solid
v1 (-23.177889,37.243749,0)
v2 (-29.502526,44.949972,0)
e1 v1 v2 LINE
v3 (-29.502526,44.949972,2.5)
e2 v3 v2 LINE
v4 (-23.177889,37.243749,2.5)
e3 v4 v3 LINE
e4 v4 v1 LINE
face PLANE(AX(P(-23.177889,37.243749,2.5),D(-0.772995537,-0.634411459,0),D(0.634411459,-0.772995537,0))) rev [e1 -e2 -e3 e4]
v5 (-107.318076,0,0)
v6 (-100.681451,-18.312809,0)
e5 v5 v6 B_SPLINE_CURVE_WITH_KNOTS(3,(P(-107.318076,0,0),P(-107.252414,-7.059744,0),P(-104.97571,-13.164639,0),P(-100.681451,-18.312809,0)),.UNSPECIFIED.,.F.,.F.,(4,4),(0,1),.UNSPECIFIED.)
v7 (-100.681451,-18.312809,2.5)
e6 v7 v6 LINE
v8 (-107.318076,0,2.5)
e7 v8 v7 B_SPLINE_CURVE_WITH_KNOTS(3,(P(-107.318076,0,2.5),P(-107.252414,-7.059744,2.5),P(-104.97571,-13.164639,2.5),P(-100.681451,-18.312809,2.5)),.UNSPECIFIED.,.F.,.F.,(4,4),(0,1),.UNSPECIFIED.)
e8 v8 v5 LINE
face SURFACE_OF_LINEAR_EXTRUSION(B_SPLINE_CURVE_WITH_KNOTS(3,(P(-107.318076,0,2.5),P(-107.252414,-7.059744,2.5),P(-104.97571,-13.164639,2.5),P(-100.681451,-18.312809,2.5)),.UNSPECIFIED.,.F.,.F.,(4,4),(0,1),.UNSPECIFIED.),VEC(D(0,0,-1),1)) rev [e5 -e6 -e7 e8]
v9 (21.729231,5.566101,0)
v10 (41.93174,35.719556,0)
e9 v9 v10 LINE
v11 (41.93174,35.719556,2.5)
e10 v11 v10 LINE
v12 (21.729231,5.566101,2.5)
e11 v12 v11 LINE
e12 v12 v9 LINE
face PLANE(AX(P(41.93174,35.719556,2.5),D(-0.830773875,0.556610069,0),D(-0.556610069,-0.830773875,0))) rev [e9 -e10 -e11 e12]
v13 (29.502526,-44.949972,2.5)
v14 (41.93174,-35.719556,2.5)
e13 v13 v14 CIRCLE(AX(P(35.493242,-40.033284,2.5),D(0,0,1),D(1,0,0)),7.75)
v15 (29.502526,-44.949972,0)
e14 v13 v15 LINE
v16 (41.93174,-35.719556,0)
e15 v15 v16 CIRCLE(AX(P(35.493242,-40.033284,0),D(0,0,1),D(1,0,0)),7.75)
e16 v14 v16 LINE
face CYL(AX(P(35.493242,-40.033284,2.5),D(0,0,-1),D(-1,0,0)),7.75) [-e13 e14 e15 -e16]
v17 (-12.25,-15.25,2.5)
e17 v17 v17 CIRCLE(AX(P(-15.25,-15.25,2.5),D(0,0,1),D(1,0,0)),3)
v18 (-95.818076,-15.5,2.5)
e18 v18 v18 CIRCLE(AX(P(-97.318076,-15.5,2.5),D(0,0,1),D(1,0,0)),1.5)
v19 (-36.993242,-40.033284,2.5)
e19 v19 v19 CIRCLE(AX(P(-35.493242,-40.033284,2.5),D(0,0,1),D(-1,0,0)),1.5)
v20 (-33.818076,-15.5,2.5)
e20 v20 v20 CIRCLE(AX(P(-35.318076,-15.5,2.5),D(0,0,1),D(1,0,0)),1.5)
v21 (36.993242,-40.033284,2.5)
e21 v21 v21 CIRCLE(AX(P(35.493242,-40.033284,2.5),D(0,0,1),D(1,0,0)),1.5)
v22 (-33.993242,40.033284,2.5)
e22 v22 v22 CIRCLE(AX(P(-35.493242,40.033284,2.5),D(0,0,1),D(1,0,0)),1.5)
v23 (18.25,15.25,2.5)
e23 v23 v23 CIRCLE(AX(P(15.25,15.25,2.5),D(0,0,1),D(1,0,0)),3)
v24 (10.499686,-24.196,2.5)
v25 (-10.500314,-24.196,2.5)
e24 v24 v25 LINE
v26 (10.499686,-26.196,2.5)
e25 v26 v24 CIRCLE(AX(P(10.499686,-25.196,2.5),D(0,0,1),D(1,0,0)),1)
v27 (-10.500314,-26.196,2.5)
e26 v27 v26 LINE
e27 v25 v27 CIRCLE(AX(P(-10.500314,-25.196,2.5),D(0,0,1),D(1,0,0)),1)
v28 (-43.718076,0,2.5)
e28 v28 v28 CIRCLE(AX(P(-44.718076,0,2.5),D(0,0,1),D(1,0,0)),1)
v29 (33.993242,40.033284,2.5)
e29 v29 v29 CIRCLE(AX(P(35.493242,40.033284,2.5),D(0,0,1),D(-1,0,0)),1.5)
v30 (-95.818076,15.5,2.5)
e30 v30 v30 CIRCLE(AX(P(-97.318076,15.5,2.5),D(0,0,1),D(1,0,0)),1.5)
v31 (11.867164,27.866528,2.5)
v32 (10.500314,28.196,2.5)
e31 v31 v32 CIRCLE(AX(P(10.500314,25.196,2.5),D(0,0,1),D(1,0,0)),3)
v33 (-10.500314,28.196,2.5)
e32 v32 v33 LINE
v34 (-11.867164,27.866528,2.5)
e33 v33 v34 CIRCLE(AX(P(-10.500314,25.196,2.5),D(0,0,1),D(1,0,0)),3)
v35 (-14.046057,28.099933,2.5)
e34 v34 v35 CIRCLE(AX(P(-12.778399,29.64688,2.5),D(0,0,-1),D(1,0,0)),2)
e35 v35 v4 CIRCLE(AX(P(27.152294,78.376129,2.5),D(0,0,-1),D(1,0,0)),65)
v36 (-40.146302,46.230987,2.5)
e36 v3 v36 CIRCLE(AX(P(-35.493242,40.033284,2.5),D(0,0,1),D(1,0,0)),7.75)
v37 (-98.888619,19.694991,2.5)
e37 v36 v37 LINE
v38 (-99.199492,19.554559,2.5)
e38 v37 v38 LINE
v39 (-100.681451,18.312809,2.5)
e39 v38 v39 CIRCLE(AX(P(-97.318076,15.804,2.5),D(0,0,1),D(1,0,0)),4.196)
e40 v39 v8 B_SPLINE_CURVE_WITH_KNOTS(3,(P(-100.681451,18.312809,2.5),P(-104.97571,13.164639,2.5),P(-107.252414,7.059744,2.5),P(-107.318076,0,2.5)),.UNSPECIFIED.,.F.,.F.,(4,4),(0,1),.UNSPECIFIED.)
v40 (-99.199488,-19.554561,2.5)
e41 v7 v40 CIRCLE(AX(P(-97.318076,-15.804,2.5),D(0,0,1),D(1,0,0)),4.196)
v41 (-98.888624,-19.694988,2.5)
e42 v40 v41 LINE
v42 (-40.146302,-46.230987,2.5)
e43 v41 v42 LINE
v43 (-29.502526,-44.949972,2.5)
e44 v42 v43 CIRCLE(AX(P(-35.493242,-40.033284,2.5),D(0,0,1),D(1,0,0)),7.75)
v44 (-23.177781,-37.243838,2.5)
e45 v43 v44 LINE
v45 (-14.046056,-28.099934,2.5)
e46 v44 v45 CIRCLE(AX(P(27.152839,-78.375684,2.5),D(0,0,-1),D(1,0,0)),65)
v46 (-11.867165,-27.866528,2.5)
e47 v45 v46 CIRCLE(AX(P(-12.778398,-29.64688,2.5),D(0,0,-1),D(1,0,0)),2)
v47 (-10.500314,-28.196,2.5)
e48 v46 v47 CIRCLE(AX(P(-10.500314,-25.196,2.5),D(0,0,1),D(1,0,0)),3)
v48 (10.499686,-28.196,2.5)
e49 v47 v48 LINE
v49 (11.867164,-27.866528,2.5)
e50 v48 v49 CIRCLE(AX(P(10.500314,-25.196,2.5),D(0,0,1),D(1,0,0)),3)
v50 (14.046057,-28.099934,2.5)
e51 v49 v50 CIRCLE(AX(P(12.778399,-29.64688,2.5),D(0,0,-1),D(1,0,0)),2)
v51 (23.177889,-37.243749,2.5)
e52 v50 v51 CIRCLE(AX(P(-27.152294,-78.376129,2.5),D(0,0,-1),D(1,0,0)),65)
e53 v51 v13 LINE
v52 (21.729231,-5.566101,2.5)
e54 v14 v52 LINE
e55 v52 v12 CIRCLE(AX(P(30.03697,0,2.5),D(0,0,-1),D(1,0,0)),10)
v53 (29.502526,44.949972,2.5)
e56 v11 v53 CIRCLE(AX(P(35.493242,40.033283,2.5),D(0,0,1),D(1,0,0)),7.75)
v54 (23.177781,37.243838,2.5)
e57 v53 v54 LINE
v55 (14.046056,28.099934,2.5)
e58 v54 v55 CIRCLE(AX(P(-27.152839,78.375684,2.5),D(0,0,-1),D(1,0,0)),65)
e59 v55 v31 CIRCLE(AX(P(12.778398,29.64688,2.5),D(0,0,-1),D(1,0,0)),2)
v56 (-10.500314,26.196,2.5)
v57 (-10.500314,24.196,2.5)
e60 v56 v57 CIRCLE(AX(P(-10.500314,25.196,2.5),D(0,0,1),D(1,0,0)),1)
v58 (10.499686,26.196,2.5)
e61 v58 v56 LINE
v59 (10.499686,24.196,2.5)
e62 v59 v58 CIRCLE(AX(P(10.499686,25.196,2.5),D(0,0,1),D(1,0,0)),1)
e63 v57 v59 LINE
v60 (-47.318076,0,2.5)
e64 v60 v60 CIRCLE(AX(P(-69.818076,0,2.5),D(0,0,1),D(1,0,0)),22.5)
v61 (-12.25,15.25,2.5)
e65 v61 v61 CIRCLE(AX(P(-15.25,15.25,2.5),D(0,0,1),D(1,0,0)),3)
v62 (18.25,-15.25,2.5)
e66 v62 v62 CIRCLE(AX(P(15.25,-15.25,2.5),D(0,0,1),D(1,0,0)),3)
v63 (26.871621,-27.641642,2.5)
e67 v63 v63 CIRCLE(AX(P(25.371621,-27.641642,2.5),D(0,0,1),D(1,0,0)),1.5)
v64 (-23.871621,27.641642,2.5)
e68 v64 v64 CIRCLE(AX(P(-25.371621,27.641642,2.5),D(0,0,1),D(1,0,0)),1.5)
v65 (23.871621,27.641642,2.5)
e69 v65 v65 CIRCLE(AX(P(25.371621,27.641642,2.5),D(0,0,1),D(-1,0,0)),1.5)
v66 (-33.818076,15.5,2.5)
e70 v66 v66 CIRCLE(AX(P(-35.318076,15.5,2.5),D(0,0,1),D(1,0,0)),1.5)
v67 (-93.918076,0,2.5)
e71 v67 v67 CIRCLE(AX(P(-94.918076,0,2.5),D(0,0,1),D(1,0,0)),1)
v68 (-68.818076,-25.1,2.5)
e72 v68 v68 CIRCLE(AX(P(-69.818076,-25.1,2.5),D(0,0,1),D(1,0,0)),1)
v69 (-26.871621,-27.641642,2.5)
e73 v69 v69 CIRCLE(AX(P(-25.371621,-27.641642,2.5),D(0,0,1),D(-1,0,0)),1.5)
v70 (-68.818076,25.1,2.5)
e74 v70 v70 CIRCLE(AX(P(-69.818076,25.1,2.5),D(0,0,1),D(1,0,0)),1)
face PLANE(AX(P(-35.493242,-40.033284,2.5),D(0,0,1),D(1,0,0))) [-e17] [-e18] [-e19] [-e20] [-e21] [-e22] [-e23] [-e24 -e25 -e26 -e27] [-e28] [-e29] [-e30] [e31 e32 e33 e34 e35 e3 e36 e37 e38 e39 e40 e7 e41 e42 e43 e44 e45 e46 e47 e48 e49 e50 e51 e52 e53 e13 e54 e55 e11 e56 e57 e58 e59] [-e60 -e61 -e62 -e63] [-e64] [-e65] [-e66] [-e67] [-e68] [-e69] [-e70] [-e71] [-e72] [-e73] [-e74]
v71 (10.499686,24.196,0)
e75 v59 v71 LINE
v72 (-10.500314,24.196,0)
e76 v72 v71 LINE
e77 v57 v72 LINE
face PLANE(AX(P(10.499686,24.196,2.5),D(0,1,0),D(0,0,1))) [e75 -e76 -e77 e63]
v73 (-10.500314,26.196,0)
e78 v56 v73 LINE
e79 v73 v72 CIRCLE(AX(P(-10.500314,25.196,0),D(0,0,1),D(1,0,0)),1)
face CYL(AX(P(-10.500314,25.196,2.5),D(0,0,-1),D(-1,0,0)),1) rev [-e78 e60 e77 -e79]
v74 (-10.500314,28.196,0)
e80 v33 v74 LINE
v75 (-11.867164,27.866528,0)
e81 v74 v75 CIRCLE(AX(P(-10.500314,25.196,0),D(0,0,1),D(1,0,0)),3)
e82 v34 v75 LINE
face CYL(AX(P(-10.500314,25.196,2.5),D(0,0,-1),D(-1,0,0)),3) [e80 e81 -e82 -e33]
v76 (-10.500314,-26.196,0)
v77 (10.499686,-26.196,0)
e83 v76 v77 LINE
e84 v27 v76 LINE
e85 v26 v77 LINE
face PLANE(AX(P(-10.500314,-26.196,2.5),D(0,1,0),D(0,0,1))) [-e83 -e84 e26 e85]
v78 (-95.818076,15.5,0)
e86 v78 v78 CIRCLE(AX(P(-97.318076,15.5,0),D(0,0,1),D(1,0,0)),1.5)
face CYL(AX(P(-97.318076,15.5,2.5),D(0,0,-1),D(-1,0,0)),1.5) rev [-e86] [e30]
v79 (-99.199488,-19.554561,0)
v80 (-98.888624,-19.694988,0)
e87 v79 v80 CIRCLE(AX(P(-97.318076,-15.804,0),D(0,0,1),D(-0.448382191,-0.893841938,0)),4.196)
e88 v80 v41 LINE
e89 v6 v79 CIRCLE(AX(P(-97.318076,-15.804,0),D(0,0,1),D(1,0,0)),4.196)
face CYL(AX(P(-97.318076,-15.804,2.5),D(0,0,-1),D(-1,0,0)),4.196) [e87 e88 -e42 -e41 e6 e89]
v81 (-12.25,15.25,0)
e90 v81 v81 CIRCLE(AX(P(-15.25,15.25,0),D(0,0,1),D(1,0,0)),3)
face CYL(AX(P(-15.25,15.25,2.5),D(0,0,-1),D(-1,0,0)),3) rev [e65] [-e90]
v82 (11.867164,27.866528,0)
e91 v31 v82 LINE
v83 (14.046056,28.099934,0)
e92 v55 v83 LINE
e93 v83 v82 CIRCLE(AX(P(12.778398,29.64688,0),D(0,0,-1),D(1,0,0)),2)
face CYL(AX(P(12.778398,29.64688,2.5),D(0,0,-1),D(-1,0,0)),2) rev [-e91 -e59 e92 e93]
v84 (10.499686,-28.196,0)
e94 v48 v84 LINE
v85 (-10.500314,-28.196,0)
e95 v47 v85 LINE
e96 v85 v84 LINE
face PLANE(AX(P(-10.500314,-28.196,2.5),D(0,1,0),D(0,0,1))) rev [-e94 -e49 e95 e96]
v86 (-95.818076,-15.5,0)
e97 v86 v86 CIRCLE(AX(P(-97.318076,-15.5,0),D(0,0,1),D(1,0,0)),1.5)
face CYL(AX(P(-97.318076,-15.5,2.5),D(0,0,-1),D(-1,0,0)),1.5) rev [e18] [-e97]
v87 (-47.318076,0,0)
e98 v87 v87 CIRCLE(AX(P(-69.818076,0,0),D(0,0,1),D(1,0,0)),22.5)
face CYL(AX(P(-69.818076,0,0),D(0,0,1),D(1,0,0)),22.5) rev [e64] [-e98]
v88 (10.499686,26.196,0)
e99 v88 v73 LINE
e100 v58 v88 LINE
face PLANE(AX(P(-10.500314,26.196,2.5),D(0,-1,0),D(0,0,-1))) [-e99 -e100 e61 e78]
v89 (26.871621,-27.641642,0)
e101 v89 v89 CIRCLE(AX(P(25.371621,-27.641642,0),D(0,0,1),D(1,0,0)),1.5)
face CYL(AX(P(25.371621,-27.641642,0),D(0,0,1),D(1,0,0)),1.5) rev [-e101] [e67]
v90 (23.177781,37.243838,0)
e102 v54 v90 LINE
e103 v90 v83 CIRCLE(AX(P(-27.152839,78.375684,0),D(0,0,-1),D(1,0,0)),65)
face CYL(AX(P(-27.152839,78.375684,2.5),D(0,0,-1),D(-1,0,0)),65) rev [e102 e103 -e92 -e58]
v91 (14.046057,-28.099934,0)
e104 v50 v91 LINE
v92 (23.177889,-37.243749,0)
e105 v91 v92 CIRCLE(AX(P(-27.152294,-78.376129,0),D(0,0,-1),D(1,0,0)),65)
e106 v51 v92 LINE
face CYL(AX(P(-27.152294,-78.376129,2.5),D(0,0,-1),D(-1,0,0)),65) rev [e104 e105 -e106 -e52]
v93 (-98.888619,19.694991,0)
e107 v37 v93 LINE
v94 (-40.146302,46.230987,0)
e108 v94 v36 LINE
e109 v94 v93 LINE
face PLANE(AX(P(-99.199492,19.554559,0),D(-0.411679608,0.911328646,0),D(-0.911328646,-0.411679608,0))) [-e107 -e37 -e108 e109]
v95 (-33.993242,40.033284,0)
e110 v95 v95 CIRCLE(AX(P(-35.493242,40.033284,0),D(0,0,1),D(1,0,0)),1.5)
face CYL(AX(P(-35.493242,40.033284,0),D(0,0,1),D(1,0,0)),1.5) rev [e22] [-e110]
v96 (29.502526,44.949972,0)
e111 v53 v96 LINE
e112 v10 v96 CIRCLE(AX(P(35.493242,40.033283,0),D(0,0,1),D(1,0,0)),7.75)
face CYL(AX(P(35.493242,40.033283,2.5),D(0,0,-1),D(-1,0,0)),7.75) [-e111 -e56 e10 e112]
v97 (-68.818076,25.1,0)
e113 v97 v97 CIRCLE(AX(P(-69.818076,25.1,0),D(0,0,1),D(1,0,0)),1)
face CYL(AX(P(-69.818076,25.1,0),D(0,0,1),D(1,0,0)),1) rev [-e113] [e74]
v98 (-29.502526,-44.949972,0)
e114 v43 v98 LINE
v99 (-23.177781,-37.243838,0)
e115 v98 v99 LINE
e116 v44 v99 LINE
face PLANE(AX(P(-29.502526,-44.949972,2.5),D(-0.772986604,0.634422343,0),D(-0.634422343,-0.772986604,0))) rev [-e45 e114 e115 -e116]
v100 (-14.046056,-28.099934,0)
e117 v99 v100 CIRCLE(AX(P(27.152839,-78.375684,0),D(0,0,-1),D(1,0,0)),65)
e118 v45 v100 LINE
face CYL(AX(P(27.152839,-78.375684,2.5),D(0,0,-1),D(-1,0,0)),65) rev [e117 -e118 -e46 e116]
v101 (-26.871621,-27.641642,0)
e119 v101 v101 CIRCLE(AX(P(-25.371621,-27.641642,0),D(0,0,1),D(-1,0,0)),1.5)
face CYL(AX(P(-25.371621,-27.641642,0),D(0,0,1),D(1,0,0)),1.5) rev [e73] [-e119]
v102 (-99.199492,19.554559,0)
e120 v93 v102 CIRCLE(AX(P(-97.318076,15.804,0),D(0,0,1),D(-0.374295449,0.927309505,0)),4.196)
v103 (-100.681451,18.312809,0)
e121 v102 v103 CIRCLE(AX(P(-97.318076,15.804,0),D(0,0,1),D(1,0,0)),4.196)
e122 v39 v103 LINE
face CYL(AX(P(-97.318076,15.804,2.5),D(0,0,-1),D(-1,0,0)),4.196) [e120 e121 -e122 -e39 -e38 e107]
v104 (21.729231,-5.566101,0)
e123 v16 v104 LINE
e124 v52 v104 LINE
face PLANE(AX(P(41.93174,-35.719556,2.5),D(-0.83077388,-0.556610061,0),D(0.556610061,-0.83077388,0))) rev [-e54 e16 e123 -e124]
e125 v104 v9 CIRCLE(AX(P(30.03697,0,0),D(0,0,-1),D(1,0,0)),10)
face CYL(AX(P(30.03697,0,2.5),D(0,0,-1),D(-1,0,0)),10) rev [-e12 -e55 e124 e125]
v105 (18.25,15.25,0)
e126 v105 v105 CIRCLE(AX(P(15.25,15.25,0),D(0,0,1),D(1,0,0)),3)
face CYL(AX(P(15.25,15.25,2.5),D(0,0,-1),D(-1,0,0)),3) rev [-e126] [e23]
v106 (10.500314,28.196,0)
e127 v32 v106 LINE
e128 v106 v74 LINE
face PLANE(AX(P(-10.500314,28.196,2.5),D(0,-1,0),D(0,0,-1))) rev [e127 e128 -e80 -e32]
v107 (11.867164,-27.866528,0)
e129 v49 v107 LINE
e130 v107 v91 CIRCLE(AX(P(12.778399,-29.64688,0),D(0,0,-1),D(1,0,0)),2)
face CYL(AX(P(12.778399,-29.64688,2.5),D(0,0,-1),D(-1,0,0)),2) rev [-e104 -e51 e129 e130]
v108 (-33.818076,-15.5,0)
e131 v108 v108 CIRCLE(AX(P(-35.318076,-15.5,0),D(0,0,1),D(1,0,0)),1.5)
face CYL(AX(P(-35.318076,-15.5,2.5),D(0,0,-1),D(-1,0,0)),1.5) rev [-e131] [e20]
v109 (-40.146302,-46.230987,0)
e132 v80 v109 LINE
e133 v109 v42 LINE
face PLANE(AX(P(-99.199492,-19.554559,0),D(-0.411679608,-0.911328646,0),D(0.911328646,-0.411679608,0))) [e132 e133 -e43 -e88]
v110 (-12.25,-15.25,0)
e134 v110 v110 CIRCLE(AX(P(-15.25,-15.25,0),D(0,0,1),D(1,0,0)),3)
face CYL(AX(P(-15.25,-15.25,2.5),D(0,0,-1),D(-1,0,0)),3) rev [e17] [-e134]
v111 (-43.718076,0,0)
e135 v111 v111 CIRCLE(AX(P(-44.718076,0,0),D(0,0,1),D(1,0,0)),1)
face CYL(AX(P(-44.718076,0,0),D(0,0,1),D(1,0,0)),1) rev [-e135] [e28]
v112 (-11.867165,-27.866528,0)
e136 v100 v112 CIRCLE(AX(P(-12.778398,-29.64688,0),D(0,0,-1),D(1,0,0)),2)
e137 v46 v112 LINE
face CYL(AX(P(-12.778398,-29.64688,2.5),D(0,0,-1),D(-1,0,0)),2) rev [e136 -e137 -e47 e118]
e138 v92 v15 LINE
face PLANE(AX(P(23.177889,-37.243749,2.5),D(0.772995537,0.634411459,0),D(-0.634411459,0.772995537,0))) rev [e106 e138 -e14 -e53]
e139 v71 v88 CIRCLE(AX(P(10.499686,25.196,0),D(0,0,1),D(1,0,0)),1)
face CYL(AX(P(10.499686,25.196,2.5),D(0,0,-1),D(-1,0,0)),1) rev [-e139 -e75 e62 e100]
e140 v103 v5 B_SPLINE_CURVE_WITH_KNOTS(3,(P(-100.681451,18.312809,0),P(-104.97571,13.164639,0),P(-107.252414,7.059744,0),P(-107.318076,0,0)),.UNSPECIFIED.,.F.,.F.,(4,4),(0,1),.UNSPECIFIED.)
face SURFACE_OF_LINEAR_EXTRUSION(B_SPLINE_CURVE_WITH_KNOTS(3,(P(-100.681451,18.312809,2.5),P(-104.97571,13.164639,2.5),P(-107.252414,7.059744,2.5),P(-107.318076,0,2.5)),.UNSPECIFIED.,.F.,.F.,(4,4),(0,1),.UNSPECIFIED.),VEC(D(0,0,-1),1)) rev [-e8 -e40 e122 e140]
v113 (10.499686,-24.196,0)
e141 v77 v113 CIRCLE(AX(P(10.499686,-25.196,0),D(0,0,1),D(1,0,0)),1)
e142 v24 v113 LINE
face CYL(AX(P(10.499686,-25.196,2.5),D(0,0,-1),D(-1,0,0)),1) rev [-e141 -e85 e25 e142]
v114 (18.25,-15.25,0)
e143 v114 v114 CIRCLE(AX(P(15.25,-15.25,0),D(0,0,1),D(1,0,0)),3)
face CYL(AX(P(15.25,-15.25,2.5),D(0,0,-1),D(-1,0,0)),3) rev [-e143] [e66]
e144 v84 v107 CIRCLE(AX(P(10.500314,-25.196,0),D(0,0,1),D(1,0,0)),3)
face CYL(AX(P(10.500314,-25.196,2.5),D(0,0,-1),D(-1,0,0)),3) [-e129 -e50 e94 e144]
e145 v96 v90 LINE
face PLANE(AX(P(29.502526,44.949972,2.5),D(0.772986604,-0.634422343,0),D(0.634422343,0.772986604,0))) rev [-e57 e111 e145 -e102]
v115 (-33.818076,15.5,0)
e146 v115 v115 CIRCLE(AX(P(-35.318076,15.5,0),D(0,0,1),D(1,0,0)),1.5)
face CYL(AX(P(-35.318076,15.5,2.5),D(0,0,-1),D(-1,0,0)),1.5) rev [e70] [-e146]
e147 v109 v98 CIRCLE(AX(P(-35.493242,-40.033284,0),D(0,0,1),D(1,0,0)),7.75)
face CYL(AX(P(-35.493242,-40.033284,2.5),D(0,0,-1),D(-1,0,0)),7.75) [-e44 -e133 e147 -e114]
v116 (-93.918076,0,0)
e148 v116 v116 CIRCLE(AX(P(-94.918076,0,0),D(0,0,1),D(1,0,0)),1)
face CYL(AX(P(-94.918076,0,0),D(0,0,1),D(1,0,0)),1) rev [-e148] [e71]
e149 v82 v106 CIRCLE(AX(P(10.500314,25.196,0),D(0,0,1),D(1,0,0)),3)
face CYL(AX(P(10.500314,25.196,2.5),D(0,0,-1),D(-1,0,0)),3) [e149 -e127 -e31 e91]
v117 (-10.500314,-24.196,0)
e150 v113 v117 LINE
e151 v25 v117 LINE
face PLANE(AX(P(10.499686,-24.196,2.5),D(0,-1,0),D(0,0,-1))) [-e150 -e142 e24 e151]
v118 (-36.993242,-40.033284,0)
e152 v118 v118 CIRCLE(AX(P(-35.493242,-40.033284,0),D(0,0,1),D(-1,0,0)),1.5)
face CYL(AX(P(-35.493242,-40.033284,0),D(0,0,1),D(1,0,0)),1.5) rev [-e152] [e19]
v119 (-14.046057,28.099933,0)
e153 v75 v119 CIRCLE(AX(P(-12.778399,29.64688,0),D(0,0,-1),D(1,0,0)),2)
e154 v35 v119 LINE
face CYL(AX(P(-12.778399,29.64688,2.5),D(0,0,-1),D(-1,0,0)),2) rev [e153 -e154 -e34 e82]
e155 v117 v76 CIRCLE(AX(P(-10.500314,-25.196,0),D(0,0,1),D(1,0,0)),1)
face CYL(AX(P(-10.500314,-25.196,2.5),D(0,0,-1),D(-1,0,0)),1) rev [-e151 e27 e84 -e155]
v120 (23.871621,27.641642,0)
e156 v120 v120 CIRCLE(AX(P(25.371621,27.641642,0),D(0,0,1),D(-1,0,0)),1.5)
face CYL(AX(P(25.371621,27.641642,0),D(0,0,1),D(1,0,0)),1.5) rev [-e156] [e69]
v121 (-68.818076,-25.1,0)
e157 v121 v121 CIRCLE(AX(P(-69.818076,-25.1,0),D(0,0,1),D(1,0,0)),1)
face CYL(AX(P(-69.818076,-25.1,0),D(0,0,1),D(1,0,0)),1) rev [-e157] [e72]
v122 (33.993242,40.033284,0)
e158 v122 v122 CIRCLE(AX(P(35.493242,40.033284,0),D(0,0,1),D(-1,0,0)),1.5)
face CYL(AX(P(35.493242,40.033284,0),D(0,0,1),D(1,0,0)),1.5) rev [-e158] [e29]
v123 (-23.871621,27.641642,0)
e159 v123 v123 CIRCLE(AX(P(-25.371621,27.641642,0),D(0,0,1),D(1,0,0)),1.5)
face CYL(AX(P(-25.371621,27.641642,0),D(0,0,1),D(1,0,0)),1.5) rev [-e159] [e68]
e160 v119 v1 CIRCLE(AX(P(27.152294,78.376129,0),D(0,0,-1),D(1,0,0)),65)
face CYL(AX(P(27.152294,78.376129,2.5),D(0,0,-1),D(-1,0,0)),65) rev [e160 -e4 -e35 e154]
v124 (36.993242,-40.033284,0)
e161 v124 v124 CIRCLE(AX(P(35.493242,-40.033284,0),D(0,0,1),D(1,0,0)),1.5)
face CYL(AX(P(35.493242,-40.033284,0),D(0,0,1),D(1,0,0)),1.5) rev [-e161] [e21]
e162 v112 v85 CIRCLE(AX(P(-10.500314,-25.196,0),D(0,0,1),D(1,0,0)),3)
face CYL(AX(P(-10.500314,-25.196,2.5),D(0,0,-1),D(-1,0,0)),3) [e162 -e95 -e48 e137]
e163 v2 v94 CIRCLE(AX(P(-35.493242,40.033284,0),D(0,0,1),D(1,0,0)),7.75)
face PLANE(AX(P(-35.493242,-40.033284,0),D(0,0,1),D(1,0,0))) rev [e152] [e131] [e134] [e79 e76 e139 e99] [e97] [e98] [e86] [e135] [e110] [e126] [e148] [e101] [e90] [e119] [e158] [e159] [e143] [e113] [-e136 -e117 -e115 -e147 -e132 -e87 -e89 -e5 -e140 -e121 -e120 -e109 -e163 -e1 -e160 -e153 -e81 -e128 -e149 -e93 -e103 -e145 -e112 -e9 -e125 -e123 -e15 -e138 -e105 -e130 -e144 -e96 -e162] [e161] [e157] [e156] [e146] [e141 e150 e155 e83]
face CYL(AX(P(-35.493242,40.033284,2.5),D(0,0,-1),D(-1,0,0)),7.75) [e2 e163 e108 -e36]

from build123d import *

# Parameters (mm, degrees)
CROQUIS1_R              = 2.25
CROQUIS1_R_2            = 3
CROQUIS1_R_3            = 1.5
CROQUIS1_R_4            = 2.249997567
SALIENTE_EXTRUIR1_DEPTH = 2.5
SALIENTE_EXTRUIR3_START = -2.5
CROQUIS6_R              = 2.250000066
CROQUIS6_R_2            = 1.5
CROQUIS6_R_3            = 2.25
SALIENTE_EXTRUIR3_DEPTH = 2.5
CROQUIS5_R              = 22.5
CROQUIS5_R_2            = 1
CORTAR_EXTRUIR5_DEPTH   = 2.5


with BuildPart() as part:
    # Croquis1 → Saliente-Extruir1 (new body)
    with BuildSketch(Plane.XY):
        with BuildLine():
            Line((-29.502526327, -44.949972179), (-23.17778065, -37.243838032))
            ThreePointArc((-23.17778065, -37.243838032), (-18.839723212, -32.444384768), (-14.046056443, -28.099933953))
            ThreePointArc((-14.046056443, -28.099933953), (-12.991422185, -27.658257217), (-11.867164621, -27.866527921))
            ThreePointArc((-11.867164621, -27.866527921), (-11.203313373, -28.112469078), (-10.500314, -28.196))
            Line((-10.500314, -28.196), (10.499686, -28.196))
            ThreePointArc((10.499686, -28.196), (11.203007921, -28.112542722), (11.867164264, -27.866528101))
            ThreePointArc((11.867164264, -27.866528101), (12.991422421, -27.658256674), (14.046057406, -28.099933523))
            ThreePointArc((14.046057406, -28.099933523), (18.839775902, -32.444337151), (23.177889012, -37.243749049))
            Line((23.177889012, -37.243749049), (29.502526012, -44.949972049))
            ThreePointArc((29.502526012, -44.949972049), (40.113877497, -46.255199126), (41.931739547, -35.719556022))
            Line((41.931739547, -35.719556022), (21.72923101, -5.566101046))
            ThreePointArc((21.72923101, -5.566101046), (20.036969431, -9.5e-08), (21.729230693, 5.566100954))
            Line((21.729230693, 5.566100954), (41.931739693, 35.719555954))
            ThreePointArc((41.931739693, 35.719555954), (40.113877277, 46.255198335), (29.502526336, 44.949972165))
            Line((29.502526336, 44.949972165), (23.17778065, 37.243838007))
            ThreePointArc((23.17778065, 37.243838007), (18.839723212, 32.444384742), (14.046056443, 28.099933927))
            ThreePointArc((14.046056443, 28.099933927), (12.991421988, 27.658257139), (11.867164252, 27.866528027))
            ThreePointArc((11.867164252, 27.866528027), (11.203313175, 28.112469073), (10.500314, 28.195999974))
            Line((10.500314, 28.195999974), (-10.500314, 28.195999974))
            ThreePointArc((-10.500314, 28.195999974), (-11.203313178, 28.112469098), (-11.867164264, 27.866528075))
            ThreePointArc((-11.867164264, 27.866528075), (-12.991422421, 27.658256648), (-14.046057406, 28.099933497))
            ThreePointArc((-14.046057406, 28.099933497), (-18.839775902, 32.444337126), (-23.177889012, 37.243749023))
            Line((-23.177889012, 37.243749023), (-29.502526012, 44.949972023))
            ThreePointArc((-29.502526012, 44.949972023), (-40.146302424, 46.230987494), (-41.886340556, 35.652554517))
            ThreePointArc((-41.886340556, 35.652554517), (-41.288874902, 25.337679941), (-50.13550001, 20.000000021))
            Line((-50.13550001, 20.000000021), (-97.31807601, 20.000000021))
            ThreePointArc((-97.31807601, 20.000000021), (-99.1994919, 19.554558541), (-100.681450855, 18.312809163))
            add(Edge.make_bspline(
                [(-107.31807554, 2.1e-08), (-107.252414123, 7.059743944), (-104.975710329, 13.164639039), (-100.681450855, 18.312809163)],
                knots=[0, 0, 0, 0, 1, 1, 1, 1], degree=3))
            add(Edge.make_bspline(
                [(-107.31807554, 2.1e-08), (-107.252414123, -7.059743902), (-104.975710329, -13.164638997), (-100.681450855, -18.312809121)],
                knots=[0, 0, 0, 0, 1, 1, 1, 1], degree=3))
            ThreePointArc((-100.681450855, -18.312809121), (-99.19949186, -19.554558345), (-97.31807601, -19.9999997))
            Line((-97.31807601, -19.9999997), (-50.13550001, -19.9999997))
            ThreePointArc((-50.13550001, -19.9999997), (-41.288874902, -25.33767962), (-41.886340556, -35.652554196))
            ThreePointArc((-41.886340556, -35.652554196), (-40.146302646, -46.230987042), (-29.502526327, -44.949972179))
        make_face()
        with Locations((-25.371621, 27.641642)):
            Circle(CROQUIS1_R, mode=Mode.SUBTRACT)
        with Locations((-35.493242035, 40.033284004)):
            Circle(CROQUIS1_R, mode=Mode.SUBTRACT)
        with Locations((-35.49324201, -40.0332837)):
            Circle(CROQUIS1_R, mode=Mode.SUBTRACT)
        with Locations((15.25, -15.25)):
            Circle(CROQUIS1_R_2, mode=Mode.SUBTRACT)
        with Locations((35.493242035, -40.03328403)):
            Circle(CROQUIS1_R, mode=Mode.SUBTRACT)
        with Locations((-15.25, 15.25)):
            Circle(CROQUIS1_R_2, mode=Mode.SUBTRACT)
        with Locations((-25.371621, -27.641642)):
            Circle(CROQUIS1_R, mode=Mode.SUBTRACT)
        with Locations((-35.318076, 15.5)):
            Circle(CROQUIS1_R_3, mode=Mode.SUBTRACT)
        with Locations((25.371621, -27.641642)):
            Circle(CROQUIS1_R, mode=Mode.SUBTRACT)
        with Locations((-15.25, -15.25)):
            Circle(CROQUIS1_R_2, mode=Mode.SUBTRACT)
        with Locations((-97.318076, 15.5)):
            Circle(CROQUIS1_R_3, mode=Mode.SUBTRACT)
        with Locations((15.25, 15.25)):
            Circle(CROQUIS1_R_2, mode=Mode.SUBTRACT)
        with Locations((-35.318076, -15.5)):
            Circle(CROQUIS1_R_3, mode=Mode.SUBTRACT)
        with Locations((25.371621, 27.641642)):
            Circle(CROQUIS1_R, mode=Mode.SUBTRACT)
        with Locations((-97.318076, -15.5)):
            Circle(CROQUIS1_R_3, mode=Mode.SUBTRACT)
        with Locations((35.493241695, 40.03328329)):
            Circle(CROQUIS1_R_4, mode=Mode.SUBTRACT)
        with BuildLine():
            Line((10.499686, -24.196), (-10.500314, -24.196))
            ThreePointArc((-10.500314, -24.196), (-11.500314, -25.196), (-10.500314, -26.196))
            Line((-10.500314, -26.196), (10.499686, -26.196))
            ThreePointArc((10.499686, -26.196), (11.499686, -25.196), (10.499686, -24.196))
        make_face(mode=Mode.SUBTRACT)
        with BuildLine():
            Line((10.499686, 24.196), (-10.500314, 24.196))
            ThreePointArc((-10.500314, 24.196), (-11.500314, 25.196), (-10.500314, 26.196))
            Line((-10.500314, 26.196), (10.499686, 26.196))
            ThreePointArc((10.499686, 26.196), (11.499686, 25.196), (10.499686, 24.196))
        make_face(mode=Mode.SUBTRACT)
    extrude(amount=SALIENTE_EXTRUIR1_DEPTH)


with BuildPart() as saliente_extruir3_tool:
    # Croquis6 → Saliente-Extruir3 (new body)
    # profile 1 of 10: a face of its own
    with BuildSketch(Plane.XY.offset(2.5).offset(SALIENTE_EXTRUIR3_START)):
        with Locations((-35.493242163, 40.033284025)):
            Circle(CROQUIS6_R)
        with Locations((-35.493242163, 40.033284025)):
            Circle(CROQUIS6_R_2, mode=Mode.SUBTRACT)
    # profile 2 of 10: a face of its own
    with BuildSketch(Plane.XY.offset(2.5).offset(SALIENTE_EXTRUIR3_START)):
        with Locations((-25.371621, 27.641642)):
            Circle(CROQUIS6_R_3)
        with Locations((-25.371621, 27.641642)):
            Circle(CROQUIS6_R_2, mode=Mode.SUBTRACT)
    # profile 3 of 10: a face of its own
    with BuildSketch(Plane.XY.offset(2.5).offset(SALIENTE_EXTRUIR3_START)):
        with Locations((25.371621, 27.641642)):
            Circle(CROQUIS6_R_3)
        with Locations(Location((25.371621, 27.641642, 0), (0, 0, 180))):
            Circle(CROQUIS6_R_2, mode=Mode.SUBTRACT)
    # profile 4 of 10: a face of its own
    with BuildSketch(Plane.XY.offset(2.5).offset(SALIENTE_EXTRUIR3_START)):
        with Locations((35.493242163, 40.033284025)):
            Circle(CROQUIS6_R)
        with Locations(Location((35.493242163, 40.033284025, 0), (0, 0, 180))):
            Circle(CROQUIS6_R_2, mode=Mode.SUBTRACT)
    # profile 5 of 10: a face of its own
    with BuildSketch(Plane.XY.offset(2.5).offset(SALIENTE_EXTRUIR3_START)):
        with Locations((35.493242163, -40.033284025)):
            Circle(CROQUIS6_R)
        with Locations((35.493242163, -40.033284025)):
            Circle(CROQUIS6_R_2, mode=Mode.SUBTRACT)
    # profile 6 of 10: a face of its own
    with BuildSketch(Plane.XY.offset(2.5).offset(SALIENTE_EXTRUIR3_START)):
        with Locations((25.371621, -27.641642)):
            Circle(CROQUIS6_R_3)
        with Locations((25.371621, -27.641642)):
            Circle(CROQUIS6_R_2, mode=Mode.SUBTRACT)
    # profile 7 of 10: a face of its own
    with BuildSketch(Plane.XY.offset(2.5).offset(SALIENTE_EXTRUIR3_START)):
        with Locations((-25.371621, -27.641642)):
            Circle(CROQUIS6_R_3)
        with Locations(Location((-25.371621, -27.641642, 0), (0, 0, 180))):
            Circle(CROQUIS6_R_2, mode=Mode.SUBTRACT)
    # profile 8 of 10: a face of its own
    with BuildSketch(Plane.XY.offset(2.5).offset(SALIENTE_EXTRUIR3_START)):
        with Locations((-35.493242163, -40.033284025)):
            Circle(CROQUIS6_R)
        with Locations(Location((-35.493242163, -40.033284025, 0), (0, 0, 180))):
            Circle(CROQUIS6_R_2, mode=Mode.SUBTRACT)
    # profile 9 of 10: a face of its own
    with BuildSketch(Plane.XY.offset(2.5).offset(SALIENTE_EXTRUIR3_START)):
        with BuildLine():
            Line((-99.1994919, 19.554558541), (-40.146302424, 46.230987494))
            ThreePointArc((-40.146302424, 46.230987494), (-43.140478024, 41.291171845), (-41.886340556, 35.652554517))
            ThreePointArc((-41.886340556, 35.652554517), (-41.288875033, 25.33768001), (-50.13550001, 20.000000021))
            Line((-50.13550001, 20.000000021), (-97.31807601, 20.000000021))
            ThreePointArc((-97.31807601, 20.000000021), (-98.214581153, 19.590579436), (-99.1994919, 19.554558541))
        make_face()
    # profile 10 of 10: a face of its own
    with BuildSketch(Plane.XY.offset(2.5).offset(SALIENTE_EXTRUIR3_START)):
        with BuildLine():
            Line((-50.13550001, -20.000000021), (-97.31807601, -20.000000021))
            ThreePointArc((-97.31807601, -20.000000021), (-98.214581153, -19.590579436), (-99.1994919, -19.554558541))
            Line((-99.1994919, -19.554558541), (-40.146302424, -46.230987494))
            ThreePointArc((-40.146302424, -46.230987494), (-43.140478024, -41.291171845), (-41.886340556, -35.652554517))
            ThreePointArc((-41.886340556, -35.652554517), (-41.288875033, -25.33768001), (-50.13550001, -20.000000021))
        make_face()
    extrude(amount=SALIENTE_EXTRUIR3_DEPTH)


with BuildPart() as part_1:
    add(part.part)


with BuildPart() as part_2:
    # Saliente-Extruir3: joined with saliente_extruir3_tool
    add(part_1.part.fuse(saliente_extruir3_tool.part, tol=0.00001))

    # Croquis5 → Cortar-Extruir5 (cut)
    with BuildSketch(Plane.XY.offset(2.5)):
        with Locations((-69.81807554, 2.1e-08)):
            Circle(CROQUIS5_R)
        with Locations((-44.71807554, 2.1e-08)):
            Circle(CROQUIS5_R_2)
        with Locations((-69.81807554, -25.099999979)):
            Circle(CROQUIS5_R_2)
        with Locations((-94.91807554, 2.1e-08)):
            Circle(CROQUIS5_R_2)
        with Locations((-69.81807554, 25.100000021)):
            Circle(CROQUIS5_R_2)
    extrude(amount=-CORTAR_EXTRUIR5_DEPTH, mode=Mode.SUBTRACT)


solid = part_2.part
